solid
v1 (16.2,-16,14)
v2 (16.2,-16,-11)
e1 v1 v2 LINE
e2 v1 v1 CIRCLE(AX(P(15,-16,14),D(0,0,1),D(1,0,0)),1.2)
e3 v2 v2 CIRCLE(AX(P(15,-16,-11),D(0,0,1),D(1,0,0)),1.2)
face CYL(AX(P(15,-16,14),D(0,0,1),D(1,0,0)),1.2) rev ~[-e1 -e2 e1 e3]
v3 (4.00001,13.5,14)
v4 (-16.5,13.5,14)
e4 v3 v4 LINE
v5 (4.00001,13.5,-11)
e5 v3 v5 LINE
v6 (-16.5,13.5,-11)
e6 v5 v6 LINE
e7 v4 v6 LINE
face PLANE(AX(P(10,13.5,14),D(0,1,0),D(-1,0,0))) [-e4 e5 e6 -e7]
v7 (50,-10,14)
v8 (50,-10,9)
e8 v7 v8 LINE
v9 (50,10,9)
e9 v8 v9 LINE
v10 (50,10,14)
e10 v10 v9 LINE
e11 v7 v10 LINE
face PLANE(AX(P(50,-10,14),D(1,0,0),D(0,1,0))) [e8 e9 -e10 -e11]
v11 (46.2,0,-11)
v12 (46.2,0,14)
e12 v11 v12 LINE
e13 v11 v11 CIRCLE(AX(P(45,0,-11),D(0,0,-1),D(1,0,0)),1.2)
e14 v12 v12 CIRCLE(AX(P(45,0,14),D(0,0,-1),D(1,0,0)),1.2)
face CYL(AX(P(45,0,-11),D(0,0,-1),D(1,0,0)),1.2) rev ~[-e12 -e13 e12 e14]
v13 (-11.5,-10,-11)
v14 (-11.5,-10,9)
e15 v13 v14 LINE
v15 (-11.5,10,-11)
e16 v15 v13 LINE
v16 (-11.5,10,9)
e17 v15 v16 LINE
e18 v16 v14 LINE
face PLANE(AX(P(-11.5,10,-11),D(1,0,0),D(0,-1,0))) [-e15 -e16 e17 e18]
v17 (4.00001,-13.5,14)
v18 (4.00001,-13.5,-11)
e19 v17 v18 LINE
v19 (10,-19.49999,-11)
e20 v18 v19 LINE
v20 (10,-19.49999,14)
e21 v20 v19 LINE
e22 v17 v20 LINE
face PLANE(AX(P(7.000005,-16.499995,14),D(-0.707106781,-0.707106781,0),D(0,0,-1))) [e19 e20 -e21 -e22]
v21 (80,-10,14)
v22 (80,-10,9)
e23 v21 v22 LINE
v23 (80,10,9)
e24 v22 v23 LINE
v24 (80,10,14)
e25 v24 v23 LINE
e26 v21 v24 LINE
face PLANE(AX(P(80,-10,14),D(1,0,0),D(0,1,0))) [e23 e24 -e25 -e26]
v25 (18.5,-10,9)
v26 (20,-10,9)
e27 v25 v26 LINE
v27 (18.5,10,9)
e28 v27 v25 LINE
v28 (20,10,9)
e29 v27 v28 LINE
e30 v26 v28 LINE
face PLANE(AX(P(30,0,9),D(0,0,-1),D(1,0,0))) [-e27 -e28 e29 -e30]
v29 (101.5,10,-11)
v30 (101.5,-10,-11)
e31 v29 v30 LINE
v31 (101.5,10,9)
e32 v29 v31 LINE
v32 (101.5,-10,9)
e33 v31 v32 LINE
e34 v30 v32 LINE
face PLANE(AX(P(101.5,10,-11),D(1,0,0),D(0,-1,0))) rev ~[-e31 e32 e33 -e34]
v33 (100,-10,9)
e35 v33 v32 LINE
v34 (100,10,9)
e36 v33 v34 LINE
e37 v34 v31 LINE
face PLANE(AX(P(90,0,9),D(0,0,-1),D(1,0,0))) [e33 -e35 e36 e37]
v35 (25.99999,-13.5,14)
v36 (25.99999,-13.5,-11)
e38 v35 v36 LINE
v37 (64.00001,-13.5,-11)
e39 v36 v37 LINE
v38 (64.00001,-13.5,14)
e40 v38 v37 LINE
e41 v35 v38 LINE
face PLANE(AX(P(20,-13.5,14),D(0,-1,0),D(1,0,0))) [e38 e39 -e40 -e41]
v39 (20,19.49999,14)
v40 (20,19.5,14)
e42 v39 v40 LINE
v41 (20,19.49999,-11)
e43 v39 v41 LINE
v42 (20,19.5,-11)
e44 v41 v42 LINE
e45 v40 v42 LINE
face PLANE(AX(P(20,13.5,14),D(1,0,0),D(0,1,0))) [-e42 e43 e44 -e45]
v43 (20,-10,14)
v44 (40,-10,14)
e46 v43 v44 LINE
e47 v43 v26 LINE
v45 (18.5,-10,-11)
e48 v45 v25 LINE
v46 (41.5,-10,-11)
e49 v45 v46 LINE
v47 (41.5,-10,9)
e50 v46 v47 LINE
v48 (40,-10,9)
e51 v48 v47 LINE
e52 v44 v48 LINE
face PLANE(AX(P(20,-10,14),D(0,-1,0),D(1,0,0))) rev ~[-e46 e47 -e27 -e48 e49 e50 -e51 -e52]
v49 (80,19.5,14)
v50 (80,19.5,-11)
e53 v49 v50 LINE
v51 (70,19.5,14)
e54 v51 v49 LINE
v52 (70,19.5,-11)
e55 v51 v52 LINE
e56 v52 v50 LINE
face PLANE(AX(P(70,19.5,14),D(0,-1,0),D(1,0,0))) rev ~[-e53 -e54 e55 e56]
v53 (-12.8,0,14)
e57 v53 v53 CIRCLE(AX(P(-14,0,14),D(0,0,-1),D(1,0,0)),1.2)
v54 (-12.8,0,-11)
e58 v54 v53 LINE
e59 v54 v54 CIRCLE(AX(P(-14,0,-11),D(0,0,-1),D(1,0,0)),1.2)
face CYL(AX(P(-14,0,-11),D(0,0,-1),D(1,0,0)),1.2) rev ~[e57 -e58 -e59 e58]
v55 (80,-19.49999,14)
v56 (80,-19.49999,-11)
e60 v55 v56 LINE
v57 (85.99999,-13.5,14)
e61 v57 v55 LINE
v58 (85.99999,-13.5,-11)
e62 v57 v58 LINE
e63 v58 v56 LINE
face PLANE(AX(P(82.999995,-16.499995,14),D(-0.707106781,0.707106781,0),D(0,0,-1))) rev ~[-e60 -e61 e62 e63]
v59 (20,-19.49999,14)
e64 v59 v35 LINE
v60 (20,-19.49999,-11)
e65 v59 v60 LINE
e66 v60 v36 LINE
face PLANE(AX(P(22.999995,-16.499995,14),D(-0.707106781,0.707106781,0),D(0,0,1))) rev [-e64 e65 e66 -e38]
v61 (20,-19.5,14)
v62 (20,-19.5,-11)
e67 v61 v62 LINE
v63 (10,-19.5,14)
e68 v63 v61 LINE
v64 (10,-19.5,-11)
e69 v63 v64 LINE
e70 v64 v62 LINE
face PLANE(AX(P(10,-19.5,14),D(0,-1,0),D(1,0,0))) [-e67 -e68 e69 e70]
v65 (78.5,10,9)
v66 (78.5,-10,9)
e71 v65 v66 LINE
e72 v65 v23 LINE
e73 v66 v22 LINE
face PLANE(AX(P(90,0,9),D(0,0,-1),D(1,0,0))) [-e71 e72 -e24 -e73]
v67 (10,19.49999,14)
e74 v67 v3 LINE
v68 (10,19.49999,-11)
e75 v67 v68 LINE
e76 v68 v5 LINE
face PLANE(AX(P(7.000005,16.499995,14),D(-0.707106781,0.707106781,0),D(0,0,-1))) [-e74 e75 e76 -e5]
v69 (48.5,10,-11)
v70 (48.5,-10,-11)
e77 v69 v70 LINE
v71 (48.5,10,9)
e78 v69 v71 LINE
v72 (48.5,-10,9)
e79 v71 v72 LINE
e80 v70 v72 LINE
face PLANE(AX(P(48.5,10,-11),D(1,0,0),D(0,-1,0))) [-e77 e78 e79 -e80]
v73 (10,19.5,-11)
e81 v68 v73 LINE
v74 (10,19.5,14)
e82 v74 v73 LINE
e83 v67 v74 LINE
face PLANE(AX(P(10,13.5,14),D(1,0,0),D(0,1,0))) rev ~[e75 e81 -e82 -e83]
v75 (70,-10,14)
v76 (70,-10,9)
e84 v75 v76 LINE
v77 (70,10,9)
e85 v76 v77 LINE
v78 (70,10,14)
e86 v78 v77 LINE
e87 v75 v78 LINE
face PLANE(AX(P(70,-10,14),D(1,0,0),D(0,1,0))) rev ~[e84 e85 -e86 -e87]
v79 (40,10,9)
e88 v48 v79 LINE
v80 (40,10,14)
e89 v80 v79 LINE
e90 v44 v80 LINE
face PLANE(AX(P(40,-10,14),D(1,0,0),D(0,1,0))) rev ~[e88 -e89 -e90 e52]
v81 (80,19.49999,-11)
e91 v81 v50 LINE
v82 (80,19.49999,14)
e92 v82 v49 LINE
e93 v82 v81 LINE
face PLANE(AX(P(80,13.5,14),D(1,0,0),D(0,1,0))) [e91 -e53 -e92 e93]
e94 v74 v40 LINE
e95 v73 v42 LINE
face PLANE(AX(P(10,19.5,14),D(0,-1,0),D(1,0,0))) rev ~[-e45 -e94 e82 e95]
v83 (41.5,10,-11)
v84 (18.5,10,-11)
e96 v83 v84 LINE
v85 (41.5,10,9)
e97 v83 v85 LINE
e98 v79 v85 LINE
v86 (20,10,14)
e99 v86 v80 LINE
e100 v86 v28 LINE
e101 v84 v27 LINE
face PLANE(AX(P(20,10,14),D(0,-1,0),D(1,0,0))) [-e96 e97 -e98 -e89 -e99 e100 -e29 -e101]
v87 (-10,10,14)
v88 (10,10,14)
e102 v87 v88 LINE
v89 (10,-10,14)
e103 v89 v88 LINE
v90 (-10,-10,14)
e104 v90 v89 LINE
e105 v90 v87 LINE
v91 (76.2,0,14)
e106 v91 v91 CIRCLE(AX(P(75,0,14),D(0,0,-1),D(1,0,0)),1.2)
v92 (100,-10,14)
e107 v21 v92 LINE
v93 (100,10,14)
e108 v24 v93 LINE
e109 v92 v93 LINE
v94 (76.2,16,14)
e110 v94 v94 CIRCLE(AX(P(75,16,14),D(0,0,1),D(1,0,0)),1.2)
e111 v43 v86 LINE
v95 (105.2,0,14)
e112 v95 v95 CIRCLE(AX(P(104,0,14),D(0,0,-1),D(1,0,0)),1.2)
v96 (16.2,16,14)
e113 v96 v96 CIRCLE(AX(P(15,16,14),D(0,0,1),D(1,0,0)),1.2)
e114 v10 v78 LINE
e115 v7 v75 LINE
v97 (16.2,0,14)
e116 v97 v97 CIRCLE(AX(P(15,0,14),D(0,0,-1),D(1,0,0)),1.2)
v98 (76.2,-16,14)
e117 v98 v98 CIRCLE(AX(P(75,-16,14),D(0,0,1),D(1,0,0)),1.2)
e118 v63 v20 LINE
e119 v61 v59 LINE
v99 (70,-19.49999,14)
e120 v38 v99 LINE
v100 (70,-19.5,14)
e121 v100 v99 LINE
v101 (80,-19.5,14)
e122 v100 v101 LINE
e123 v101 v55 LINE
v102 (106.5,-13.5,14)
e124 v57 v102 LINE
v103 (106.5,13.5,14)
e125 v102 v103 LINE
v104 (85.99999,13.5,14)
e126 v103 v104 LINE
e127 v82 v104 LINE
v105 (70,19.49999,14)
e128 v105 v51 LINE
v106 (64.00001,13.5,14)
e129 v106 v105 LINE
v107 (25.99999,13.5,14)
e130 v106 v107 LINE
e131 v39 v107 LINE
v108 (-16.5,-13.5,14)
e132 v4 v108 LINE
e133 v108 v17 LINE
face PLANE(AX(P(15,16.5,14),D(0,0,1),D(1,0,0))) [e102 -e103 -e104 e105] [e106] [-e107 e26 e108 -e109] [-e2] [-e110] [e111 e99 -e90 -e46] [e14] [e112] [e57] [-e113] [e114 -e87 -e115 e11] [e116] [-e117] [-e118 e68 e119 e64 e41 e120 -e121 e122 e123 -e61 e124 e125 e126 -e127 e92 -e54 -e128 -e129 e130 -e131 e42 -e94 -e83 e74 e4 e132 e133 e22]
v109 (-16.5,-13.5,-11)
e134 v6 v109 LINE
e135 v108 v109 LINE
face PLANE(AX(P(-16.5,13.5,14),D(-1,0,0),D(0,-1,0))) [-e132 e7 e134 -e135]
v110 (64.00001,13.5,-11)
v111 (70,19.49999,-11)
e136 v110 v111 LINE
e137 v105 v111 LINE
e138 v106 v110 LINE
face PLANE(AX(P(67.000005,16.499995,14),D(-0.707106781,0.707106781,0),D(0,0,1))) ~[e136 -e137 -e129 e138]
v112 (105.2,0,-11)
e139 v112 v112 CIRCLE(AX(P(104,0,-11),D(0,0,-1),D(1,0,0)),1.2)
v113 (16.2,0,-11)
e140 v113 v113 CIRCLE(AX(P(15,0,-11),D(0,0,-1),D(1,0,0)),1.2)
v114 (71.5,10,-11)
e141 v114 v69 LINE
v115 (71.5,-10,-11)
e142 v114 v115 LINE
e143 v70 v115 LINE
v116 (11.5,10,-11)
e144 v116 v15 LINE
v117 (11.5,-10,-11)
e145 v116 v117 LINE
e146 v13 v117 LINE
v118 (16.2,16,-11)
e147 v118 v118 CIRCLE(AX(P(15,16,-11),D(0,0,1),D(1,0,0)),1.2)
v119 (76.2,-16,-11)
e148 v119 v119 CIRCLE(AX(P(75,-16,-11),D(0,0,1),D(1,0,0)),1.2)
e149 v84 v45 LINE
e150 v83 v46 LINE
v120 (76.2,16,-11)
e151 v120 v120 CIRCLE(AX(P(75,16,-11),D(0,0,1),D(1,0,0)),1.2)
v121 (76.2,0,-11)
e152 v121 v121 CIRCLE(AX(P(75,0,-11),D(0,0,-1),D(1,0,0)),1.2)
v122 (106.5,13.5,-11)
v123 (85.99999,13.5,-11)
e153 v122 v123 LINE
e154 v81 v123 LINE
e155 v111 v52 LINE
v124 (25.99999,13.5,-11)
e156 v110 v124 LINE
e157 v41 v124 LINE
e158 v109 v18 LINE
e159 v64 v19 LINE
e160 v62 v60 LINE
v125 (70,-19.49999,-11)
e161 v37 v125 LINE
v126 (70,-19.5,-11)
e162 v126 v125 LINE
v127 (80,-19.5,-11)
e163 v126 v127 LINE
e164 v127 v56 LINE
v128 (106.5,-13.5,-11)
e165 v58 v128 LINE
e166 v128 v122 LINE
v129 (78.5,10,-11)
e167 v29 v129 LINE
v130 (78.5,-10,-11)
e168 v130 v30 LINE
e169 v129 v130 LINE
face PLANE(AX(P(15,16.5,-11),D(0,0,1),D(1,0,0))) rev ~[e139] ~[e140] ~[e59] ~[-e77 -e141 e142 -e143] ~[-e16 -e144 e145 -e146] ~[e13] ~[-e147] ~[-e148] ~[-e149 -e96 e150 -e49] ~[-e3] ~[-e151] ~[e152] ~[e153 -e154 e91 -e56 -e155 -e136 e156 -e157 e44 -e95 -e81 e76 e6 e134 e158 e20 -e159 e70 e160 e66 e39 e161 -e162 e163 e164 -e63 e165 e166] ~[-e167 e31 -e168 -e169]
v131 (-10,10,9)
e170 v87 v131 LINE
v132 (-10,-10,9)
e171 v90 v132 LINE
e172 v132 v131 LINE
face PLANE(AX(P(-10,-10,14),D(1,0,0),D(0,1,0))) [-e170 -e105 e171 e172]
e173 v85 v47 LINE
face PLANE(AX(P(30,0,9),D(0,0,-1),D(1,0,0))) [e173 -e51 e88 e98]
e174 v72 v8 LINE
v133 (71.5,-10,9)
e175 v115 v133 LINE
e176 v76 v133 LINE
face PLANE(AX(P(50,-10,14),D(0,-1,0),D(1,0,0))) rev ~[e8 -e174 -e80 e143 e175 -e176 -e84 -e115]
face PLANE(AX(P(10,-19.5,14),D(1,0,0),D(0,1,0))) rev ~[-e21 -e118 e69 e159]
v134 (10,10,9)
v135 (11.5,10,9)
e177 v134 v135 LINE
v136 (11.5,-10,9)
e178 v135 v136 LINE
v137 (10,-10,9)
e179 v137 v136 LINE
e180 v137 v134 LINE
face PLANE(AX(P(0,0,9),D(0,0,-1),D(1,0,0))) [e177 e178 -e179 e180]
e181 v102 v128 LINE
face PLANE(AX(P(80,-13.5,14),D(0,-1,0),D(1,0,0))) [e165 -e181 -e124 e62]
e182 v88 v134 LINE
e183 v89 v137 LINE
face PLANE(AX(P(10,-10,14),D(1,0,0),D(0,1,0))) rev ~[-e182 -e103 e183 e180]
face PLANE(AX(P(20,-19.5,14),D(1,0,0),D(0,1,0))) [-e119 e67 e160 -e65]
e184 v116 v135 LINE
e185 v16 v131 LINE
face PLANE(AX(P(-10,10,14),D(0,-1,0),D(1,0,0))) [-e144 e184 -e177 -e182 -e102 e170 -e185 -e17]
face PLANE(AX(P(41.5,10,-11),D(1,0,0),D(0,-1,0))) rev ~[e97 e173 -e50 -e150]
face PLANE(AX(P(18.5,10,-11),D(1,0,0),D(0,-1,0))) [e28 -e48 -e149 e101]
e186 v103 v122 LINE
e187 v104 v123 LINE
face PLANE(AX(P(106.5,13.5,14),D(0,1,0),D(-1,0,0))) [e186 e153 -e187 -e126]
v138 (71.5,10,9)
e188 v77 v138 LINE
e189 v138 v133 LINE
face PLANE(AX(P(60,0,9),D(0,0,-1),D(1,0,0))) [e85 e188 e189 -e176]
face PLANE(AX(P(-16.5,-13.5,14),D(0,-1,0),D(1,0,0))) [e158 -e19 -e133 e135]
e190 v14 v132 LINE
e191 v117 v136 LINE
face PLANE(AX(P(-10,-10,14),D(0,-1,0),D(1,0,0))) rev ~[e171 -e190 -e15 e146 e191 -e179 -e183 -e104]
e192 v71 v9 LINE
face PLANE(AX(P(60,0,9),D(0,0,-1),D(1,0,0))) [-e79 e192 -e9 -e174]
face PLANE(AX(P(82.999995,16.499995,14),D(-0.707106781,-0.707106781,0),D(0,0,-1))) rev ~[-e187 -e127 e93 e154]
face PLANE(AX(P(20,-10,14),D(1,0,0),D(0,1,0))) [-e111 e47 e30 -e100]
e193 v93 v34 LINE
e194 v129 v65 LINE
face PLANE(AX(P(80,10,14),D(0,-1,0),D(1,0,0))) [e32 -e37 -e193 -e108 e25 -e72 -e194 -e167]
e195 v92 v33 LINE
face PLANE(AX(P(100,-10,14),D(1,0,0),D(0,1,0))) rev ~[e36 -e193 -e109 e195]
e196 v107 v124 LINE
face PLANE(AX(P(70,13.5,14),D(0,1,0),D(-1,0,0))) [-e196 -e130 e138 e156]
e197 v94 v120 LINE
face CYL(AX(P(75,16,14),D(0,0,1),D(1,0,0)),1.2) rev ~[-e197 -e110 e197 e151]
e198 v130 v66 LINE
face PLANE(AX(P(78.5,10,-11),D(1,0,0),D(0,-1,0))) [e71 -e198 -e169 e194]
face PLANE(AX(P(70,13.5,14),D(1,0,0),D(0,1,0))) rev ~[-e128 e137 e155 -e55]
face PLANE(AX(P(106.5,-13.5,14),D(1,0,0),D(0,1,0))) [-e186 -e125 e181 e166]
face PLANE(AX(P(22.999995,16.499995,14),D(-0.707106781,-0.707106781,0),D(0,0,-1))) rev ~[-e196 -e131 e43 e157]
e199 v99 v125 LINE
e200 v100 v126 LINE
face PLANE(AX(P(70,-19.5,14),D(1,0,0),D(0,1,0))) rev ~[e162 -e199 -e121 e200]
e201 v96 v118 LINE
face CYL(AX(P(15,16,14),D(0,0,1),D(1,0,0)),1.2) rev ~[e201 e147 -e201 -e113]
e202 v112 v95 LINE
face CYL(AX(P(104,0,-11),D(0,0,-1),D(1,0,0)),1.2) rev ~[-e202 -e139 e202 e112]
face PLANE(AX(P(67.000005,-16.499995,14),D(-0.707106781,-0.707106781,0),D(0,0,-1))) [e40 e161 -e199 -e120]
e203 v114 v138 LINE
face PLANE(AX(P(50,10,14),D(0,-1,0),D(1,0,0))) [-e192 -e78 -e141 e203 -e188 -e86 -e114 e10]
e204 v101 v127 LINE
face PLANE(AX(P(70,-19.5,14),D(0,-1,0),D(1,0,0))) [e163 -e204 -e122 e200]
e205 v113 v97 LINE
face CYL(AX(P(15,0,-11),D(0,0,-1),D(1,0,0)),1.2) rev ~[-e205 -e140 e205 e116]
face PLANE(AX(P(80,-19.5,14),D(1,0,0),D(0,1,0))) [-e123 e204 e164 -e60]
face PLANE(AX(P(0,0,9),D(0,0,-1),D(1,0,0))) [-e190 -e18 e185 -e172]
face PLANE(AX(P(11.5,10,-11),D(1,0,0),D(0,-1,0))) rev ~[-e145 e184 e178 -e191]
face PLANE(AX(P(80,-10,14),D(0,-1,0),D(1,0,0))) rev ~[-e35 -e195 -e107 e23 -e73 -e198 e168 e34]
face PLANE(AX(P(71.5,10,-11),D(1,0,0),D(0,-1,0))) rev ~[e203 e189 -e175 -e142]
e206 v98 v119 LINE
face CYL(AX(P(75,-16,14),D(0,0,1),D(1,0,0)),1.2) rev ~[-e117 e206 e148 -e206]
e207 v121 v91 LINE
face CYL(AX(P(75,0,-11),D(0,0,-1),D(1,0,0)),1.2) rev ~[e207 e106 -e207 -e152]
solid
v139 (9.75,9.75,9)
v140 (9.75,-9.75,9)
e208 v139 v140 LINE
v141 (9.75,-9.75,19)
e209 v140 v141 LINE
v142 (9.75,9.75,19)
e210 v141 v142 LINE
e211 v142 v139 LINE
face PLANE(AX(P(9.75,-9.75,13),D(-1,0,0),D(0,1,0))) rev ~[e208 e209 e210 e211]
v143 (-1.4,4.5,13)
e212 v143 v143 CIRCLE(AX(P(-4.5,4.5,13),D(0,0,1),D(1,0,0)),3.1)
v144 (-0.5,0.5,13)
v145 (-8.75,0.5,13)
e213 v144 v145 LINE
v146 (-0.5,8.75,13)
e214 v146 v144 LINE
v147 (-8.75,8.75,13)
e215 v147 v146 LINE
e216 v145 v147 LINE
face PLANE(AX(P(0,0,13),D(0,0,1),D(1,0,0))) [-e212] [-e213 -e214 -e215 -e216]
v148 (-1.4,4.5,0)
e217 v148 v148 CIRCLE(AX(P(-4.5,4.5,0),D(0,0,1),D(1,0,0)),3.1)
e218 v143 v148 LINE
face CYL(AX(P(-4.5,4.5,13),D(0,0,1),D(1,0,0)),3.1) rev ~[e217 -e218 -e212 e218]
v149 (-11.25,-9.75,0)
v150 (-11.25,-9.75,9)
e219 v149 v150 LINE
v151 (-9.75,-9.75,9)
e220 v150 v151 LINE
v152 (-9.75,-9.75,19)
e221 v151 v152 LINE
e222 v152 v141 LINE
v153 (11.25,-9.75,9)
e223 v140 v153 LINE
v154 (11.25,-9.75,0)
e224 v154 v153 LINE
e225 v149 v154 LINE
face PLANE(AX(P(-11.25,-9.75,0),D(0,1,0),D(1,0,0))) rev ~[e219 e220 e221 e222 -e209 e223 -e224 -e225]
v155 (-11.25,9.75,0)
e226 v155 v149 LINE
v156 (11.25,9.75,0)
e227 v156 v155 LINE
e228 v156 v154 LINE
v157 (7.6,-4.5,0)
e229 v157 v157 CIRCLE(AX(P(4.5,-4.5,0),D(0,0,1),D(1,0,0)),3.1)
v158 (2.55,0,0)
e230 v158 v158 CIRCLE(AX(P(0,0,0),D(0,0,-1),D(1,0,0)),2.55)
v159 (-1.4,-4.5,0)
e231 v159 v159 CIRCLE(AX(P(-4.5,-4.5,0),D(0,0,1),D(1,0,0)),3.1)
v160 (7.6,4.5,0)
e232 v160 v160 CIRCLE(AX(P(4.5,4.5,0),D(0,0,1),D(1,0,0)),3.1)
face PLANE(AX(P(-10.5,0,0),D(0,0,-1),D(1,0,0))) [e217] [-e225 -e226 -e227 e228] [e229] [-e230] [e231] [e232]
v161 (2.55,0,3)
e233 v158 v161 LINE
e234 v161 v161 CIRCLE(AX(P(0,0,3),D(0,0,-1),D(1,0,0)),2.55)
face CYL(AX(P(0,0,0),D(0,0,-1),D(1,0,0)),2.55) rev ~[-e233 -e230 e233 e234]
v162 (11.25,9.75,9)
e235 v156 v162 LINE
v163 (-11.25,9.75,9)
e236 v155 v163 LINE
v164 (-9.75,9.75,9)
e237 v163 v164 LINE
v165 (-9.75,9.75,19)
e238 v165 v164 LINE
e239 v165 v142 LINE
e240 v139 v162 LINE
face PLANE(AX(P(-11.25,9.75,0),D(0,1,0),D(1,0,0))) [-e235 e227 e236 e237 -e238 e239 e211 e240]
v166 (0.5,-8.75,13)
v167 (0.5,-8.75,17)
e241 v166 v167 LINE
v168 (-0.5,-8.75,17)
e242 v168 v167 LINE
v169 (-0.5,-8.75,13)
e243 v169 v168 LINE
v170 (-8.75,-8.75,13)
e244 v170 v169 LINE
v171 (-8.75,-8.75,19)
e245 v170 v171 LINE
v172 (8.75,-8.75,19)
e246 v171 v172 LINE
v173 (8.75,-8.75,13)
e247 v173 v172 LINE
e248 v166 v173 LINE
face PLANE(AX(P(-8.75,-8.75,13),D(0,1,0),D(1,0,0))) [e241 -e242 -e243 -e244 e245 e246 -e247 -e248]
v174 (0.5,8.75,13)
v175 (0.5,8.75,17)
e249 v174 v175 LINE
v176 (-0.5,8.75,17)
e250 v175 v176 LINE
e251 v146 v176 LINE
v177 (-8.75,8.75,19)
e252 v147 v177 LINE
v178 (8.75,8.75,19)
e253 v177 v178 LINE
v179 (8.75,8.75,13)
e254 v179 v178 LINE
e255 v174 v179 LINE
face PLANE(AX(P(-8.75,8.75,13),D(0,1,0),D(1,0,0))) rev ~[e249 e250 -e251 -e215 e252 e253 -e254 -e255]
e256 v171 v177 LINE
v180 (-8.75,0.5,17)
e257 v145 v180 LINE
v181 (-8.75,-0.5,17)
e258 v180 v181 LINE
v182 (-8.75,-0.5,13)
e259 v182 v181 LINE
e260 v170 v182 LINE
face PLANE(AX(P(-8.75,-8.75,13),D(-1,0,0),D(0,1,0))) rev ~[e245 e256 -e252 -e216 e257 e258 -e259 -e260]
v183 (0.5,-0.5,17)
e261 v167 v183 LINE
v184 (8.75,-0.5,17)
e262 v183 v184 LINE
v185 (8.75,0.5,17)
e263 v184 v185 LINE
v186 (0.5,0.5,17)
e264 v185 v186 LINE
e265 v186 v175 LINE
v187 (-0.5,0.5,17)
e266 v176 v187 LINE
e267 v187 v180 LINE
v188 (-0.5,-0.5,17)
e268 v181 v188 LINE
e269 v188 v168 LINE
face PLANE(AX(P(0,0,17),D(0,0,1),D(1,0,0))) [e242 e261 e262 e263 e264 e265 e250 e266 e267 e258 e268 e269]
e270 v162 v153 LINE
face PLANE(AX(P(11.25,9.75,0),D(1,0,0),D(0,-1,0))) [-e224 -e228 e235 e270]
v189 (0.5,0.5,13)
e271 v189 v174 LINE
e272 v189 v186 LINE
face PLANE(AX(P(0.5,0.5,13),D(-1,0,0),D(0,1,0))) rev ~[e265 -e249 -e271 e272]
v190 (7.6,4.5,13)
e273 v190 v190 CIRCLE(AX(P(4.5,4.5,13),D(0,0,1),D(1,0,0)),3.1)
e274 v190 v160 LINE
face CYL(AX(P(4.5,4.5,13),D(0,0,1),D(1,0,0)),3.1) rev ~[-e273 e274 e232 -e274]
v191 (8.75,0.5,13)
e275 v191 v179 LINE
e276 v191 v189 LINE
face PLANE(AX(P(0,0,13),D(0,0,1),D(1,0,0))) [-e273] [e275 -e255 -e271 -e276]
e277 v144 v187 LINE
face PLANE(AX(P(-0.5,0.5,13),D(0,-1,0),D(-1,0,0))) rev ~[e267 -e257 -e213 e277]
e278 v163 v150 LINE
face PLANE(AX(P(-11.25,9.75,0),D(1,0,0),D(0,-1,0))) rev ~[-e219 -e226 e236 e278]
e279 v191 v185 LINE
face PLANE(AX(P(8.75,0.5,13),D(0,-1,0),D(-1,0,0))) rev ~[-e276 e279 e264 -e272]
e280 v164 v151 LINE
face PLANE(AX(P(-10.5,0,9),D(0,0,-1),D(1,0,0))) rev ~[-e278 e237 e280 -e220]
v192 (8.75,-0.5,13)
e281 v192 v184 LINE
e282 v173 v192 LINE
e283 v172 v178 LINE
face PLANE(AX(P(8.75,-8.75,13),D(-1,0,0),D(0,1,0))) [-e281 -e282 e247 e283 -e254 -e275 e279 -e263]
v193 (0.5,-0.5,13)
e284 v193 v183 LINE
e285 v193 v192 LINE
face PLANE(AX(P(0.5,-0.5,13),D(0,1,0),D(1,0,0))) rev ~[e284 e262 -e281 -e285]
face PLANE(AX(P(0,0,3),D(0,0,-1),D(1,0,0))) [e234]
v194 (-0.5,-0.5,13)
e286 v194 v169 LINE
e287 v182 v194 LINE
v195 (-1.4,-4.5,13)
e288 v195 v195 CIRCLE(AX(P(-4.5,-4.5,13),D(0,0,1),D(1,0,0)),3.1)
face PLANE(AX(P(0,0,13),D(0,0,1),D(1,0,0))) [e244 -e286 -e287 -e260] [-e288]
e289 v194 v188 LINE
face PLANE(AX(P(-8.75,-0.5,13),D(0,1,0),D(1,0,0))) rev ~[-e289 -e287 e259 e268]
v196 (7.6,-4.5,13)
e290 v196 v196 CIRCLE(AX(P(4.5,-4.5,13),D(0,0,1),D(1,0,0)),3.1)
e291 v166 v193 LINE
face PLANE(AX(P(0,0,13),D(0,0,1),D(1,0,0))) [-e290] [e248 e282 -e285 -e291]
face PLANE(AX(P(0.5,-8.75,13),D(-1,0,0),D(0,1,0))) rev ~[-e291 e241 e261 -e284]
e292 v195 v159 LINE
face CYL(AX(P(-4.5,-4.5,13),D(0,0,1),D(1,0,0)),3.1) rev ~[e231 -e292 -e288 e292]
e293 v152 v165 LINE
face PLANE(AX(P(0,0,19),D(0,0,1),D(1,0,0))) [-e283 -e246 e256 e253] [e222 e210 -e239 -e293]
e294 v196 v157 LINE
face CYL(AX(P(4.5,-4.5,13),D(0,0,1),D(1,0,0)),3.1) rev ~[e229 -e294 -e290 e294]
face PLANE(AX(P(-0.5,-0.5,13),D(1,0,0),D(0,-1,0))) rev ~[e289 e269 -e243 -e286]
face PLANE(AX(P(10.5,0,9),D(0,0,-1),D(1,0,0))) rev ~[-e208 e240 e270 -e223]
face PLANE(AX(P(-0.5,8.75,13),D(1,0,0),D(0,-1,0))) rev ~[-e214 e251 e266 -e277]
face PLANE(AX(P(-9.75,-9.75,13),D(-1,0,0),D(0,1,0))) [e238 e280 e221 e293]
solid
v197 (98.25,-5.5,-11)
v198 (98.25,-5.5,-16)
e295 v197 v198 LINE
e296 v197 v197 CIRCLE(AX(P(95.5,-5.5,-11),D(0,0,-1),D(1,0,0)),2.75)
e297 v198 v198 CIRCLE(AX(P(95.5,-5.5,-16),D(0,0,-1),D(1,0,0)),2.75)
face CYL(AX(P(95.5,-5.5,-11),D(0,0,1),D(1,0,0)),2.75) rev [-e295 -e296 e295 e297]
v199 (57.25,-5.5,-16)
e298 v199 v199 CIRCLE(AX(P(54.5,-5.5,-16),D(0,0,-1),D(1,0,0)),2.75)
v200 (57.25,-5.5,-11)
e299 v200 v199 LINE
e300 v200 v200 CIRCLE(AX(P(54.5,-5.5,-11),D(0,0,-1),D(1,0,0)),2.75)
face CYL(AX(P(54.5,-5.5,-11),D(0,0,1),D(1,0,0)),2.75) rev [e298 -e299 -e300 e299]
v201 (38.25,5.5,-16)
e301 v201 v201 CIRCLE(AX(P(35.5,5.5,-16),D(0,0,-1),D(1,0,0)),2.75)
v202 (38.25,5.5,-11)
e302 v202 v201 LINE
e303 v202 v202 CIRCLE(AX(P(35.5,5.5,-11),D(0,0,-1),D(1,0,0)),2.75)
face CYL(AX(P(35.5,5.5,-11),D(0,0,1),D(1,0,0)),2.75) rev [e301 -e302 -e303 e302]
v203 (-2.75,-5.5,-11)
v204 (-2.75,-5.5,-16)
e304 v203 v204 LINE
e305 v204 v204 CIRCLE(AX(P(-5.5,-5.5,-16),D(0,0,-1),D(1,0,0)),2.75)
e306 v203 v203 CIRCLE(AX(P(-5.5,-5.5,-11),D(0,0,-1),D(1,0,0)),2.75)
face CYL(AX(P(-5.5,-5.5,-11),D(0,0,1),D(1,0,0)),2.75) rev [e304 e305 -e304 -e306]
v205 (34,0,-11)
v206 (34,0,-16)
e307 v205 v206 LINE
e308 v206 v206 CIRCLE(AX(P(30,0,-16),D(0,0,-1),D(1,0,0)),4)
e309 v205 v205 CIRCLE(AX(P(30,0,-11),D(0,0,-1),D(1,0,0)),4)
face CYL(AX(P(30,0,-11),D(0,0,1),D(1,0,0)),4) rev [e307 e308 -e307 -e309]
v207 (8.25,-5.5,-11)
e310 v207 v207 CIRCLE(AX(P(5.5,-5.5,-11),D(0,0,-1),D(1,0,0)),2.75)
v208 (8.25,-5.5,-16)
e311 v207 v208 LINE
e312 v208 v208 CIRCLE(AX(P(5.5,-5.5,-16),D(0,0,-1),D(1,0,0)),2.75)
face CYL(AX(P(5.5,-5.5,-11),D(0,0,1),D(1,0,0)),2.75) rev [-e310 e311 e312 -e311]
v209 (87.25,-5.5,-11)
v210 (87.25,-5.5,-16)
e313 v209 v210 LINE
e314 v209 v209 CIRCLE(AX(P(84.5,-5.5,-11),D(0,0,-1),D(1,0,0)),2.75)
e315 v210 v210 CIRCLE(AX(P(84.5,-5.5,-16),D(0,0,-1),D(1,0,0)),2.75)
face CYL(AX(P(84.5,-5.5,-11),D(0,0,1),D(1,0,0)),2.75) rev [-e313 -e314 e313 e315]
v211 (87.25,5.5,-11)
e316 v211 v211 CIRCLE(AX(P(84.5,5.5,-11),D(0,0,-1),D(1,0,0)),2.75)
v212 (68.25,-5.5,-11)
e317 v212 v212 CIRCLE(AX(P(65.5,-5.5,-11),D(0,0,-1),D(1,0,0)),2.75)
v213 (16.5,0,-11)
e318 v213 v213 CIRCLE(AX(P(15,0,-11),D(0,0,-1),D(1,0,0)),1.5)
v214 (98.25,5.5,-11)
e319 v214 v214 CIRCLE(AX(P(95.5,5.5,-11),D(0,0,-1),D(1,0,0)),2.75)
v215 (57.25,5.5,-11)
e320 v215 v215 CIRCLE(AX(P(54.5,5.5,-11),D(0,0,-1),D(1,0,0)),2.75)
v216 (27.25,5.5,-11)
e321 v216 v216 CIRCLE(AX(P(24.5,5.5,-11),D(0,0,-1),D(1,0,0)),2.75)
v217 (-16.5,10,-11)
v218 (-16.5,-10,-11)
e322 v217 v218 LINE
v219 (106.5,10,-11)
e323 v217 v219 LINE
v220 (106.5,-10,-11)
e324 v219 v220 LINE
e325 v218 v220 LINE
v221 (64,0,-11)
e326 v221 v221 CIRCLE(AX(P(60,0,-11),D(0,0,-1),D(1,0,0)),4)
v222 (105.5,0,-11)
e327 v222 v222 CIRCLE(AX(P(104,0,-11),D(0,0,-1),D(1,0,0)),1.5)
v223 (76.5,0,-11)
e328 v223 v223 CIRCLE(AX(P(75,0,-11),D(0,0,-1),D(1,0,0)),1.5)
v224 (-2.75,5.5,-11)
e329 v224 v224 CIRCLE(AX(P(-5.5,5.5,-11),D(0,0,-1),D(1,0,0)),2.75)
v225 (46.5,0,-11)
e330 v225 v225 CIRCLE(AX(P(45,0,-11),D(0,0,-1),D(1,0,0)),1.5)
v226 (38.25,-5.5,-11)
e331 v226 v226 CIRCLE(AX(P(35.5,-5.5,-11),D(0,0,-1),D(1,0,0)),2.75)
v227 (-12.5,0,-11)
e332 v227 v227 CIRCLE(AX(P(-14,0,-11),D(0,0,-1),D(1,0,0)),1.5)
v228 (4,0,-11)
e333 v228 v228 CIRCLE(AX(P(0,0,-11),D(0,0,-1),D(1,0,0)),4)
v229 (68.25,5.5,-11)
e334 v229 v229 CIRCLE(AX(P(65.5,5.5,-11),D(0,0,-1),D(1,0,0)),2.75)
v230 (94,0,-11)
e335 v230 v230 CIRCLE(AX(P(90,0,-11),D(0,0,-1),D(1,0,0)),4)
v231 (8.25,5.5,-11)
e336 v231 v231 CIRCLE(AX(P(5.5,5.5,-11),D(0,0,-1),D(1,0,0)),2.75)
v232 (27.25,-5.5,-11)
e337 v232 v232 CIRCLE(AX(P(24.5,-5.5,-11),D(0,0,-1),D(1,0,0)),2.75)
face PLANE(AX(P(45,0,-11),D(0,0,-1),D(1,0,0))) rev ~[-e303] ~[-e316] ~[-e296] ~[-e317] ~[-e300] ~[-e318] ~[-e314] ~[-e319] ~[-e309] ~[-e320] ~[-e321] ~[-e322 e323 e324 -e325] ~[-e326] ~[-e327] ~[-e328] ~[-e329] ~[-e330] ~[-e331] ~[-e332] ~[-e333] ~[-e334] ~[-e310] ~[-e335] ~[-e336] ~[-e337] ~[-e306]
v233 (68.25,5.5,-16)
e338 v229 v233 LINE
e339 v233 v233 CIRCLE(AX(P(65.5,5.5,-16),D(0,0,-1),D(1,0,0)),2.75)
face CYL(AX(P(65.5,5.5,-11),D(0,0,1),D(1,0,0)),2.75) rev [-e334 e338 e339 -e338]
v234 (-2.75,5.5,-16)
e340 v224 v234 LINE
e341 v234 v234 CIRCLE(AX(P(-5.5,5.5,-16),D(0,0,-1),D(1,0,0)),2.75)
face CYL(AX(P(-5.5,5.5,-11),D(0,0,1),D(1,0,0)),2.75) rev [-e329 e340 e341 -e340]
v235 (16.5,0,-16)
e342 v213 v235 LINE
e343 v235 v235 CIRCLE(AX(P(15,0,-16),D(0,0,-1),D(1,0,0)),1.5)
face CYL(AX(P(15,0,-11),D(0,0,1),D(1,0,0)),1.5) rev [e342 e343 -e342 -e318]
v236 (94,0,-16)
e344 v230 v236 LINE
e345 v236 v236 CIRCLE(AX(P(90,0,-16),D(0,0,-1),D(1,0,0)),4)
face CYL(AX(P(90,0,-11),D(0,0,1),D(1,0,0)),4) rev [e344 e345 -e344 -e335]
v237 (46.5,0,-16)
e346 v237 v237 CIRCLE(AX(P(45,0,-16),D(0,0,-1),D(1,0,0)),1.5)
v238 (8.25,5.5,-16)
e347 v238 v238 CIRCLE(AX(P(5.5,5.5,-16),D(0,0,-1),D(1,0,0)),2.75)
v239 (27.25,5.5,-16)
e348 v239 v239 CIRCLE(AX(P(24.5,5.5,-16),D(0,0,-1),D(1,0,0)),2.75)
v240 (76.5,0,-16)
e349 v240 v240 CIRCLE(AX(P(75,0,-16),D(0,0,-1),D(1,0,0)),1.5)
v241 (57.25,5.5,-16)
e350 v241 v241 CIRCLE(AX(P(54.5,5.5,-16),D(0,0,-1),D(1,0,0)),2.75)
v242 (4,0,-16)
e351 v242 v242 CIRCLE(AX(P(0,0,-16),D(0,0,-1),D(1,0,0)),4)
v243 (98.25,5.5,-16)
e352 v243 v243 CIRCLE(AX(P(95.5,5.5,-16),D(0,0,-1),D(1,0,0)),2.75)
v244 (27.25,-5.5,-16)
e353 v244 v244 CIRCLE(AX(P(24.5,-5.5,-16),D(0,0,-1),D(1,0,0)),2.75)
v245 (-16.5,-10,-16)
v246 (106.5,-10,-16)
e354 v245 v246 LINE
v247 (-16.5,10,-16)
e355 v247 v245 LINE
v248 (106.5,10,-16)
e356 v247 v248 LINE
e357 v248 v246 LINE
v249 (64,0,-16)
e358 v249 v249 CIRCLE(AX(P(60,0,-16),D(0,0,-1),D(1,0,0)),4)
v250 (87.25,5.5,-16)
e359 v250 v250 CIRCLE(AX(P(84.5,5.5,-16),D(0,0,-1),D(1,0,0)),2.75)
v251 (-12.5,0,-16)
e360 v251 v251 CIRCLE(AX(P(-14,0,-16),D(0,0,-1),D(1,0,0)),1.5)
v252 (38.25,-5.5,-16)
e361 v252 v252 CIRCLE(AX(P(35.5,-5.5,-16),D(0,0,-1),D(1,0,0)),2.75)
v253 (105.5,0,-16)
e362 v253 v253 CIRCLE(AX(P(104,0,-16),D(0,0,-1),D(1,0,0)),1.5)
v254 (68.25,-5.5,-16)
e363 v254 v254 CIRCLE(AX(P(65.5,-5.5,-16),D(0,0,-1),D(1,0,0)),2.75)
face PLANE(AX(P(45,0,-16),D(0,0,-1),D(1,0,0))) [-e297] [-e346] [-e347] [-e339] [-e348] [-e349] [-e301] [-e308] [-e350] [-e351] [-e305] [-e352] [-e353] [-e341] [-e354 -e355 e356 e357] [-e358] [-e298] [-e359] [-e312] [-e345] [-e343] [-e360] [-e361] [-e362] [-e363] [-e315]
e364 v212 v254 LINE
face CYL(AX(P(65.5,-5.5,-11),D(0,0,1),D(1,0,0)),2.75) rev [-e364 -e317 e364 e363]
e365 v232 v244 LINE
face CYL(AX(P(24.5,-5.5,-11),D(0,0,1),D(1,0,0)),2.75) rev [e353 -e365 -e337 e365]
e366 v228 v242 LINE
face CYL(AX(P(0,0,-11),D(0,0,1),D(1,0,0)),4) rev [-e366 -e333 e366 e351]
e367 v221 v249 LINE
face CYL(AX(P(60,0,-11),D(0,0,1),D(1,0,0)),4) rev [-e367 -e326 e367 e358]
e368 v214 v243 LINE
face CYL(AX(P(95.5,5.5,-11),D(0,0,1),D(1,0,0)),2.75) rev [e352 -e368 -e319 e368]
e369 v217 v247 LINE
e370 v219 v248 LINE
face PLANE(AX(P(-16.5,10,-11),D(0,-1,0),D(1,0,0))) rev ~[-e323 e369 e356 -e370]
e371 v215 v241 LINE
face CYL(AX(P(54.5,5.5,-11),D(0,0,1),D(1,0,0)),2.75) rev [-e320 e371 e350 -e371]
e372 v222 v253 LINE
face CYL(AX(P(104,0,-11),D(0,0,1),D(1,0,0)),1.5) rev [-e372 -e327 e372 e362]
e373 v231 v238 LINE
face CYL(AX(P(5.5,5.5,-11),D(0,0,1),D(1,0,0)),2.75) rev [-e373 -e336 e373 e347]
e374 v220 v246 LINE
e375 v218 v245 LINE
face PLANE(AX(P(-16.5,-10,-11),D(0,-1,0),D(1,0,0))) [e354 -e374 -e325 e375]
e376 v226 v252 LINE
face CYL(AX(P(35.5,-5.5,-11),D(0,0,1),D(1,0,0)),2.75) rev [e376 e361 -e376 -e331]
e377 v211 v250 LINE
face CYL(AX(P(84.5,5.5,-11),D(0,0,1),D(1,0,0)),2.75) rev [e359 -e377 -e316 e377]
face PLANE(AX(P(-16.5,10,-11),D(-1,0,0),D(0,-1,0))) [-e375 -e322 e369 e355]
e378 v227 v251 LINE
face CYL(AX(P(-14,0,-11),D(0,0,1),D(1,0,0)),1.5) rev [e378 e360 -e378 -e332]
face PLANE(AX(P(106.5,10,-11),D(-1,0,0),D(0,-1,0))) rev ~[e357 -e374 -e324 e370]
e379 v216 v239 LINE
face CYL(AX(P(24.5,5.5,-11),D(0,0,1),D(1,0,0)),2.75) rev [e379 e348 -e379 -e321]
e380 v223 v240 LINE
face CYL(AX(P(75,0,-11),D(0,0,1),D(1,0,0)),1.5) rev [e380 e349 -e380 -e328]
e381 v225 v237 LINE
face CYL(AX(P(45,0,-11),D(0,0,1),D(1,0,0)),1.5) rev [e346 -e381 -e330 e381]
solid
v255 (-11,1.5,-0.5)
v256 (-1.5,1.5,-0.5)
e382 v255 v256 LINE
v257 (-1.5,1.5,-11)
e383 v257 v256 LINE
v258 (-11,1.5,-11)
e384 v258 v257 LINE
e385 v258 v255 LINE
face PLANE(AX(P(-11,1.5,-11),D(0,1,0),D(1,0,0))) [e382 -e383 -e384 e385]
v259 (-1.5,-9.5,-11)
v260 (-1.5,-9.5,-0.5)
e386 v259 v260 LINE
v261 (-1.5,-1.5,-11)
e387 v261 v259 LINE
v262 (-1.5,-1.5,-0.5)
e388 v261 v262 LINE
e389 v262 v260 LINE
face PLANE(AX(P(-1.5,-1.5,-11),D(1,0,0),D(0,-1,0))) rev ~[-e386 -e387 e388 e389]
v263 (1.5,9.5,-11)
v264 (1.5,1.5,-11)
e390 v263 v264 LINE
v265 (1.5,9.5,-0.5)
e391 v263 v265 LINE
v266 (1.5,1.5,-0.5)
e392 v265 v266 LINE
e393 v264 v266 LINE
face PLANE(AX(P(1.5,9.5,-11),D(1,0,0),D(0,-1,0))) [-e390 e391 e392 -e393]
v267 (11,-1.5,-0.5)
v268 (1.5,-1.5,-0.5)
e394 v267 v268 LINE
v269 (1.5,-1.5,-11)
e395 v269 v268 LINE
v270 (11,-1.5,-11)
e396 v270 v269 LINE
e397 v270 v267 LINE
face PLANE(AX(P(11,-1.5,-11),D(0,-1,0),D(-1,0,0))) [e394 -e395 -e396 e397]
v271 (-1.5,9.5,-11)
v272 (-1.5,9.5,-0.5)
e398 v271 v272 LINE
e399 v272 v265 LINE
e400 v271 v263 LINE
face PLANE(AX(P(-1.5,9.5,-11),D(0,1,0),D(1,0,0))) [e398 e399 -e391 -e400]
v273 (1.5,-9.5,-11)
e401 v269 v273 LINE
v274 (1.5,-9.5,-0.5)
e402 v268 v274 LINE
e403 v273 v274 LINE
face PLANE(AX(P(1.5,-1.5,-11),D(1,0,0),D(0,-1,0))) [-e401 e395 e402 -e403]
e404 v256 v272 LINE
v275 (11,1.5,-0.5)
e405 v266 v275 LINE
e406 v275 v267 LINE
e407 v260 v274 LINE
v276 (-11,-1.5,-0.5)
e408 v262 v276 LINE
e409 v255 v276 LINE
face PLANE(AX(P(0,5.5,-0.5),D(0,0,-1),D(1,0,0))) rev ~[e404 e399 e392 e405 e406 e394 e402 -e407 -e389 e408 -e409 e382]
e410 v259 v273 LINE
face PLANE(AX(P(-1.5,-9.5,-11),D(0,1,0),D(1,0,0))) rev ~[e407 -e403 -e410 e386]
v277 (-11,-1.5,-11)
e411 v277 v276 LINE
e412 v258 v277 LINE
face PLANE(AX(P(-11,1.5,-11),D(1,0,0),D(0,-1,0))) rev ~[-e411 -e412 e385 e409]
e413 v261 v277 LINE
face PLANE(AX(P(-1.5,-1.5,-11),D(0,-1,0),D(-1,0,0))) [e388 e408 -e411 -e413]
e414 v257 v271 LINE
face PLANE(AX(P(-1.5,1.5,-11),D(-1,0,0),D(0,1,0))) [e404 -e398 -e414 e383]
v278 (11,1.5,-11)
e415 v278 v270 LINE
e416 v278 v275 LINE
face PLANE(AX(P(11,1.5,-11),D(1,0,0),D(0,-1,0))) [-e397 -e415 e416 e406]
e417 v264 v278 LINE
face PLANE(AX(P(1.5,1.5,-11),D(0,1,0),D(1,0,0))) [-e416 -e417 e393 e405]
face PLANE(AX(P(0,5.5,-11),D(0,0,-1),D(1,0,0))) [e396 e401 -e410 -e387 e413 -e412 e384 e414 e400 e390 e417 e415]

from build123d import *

# Parameters (mm, degrees)
F0_W      = 19.5
F0_H      = 19.5
F1_DEPTH  = 13
F2_W      = 19.5
F2_H      = 19.5
F2_W_2    = 17.5
F2_H_2    = 17.5
F3_DEPTH  = 6
F5_DEPTH  = 4
F6_R      = 3.1
F7_DEPTH  = 19
F8_W      = 1.5
F8_H      = 19.5
F9_DEPTH  = 9
F10_R     = 2.55
F11_DEPTH = 3
F13_W     = 10
F13_H     = 6
F13_W_2   = 20
F13_H_2   = 20
F14_DEPTH = 25
F15_W     = 23
F15_H     = 20
F16_DEPTH = 20
F17_R     = 1.2
F18_DEPTH = 30
F19_R     = 1.2
F20_DEPTH = 30.001
F21_W     = 123
F21_H     = 20
F21_R     = 2.75
F21_R_2   = 1.5
F21_R_3   = 4
F22_DEPTH = 5
F23_SIZE  = 5.99999
F25_W     = 3
F25_H     = 8
F25_H_2   = 3
F25_W_2   = 9.5
F26_DEPTH = 10.5


# Not quite as in the source:
# - a fillet or chamfer is up to 0.001 mm smaller than in the source, because OpenCascade refuses the exact size


with BuildPart() as f1:
    # F0 (on Top) → F1 (new body)
    with BuildSketch(Plane.XY):
        Rectangle(F0_W, F0_H)
    extrude(amount=F1_DEPTH)

    # F2 (on face) → F3 (join)
    with BuildSketch(Plane.XY.offset(13)):
        Rectangle(F2_W, F2_H)
        Rectangle(F2_W_2, F2_H_2, mode=Mode.SUBTRACT)
    extrude(amount=F3_DEPTH)

    # F4 (on face) → F5 (join)
    with BuildSketch(Plane.XY.offset(13)):
        Polygon((0.5, 8.75), (-0.5, 8.75), (-0.5, 0.5), (-8.75, 0.5), (-8.75, -0.5), (-0.5, -0.5), (-0.5, -8.75), (0.5, -8.75), (0.5, -0.5), (8.75, -0.5), (8.75, 0.5), (0.5, 0.5), align=None)
    extrude(amount=F5_DEPTH)

    # F6 (on face) → F7 (cut)
    with BuildSketch(Plane.XY.offset(13)):
        with Locations((-4.5, 4.5)):
            Circle(F6_R)
        with Locations((-4.5, -4.5)):
            Circle(F6_R)
        with Locations((4.5, 4.5)):
            Circle(F6_R)
        with Locations((4.5, -4.5)):
            Circle(F6_R)
    extrude(amount=-F7_DEPTH, mode=Mode.SUBTRACT)

    # F8 (on face) → F9 (join)
    with BuildSketch(Plane(origin=(0, 0, 0), x_dir=(1, 0, 0), z_dir=(0, 0, -1))):
        with Locations((-10.5, 0)):
            Rectangle(F8_W, F8_H)
        with Locations((10.5, 0)):
            Rectangle(F8_W, F8_H)
    extrude(amount=-F9_DEPTH)

    # F10 (on face) → F11 (cut)
    with BuildSketch(Plane(origin=(0, 0, 0), x_dir=(1, 0, 0), z_dir=(0, 0, -1))):
        Circle(F10_R)
    extrude(amount=-F11_DEPTH, mode=Mode.SUBTRACT)


with BuildPart() as f14:
    # F13 (on offset) → F14 (new body)
    with BuildSketch(Plane.XY.offset(14)):
        with Locations((15, 16.5)):
            Rectangle(F13_W, F13_H)
        Polygon((20, 13.5), (10, 13.5), (-16.5, 13.5), (-16.5, -13.5), (10, -13.5), (20, -13.5), (70, -13.5), (80, -13.5), (106.5, -13.5), (106.5, 13.5), (80, 13.5), (70, 13.5), align=None)
        Rectangle(F13_W_2, F13_H_2, mode=Mode.SUBTRACT)
        with Locations((30, 0)):
            Rectangle(F13_W_2, F13_H_2, mode=Mode.SUBTRACT)
        with Locations((60, 0)):
            Rectangle(F13_W_2, F13_H_2, mode=Mode.SUBTRACT)
        with Locations((90, 0)):
            Rectangle(F13_W_2, F13_H_2, mode=Mode.SUBTRACT)
        with Locations((75, 16.5)):
            Rectangle(F13_W, F13_H)
        with Locations((15, -16.5)):
            Rectangle(F13_W, F13_H)
        with Locations((75, -16.5)):
            Rectangle(F13_W, F13_H)
    extrude(amount=-F14_DEPTH)

    # F15 (on face) → F16 (cut)
    with BuildSketch(Plane(origin=(0, 0, -11), x_dir=(1, 0, 0), z_dir=(0, 0, -1))):
        Rectangle(F15_W, F15_H)
        with Locations((30, 0)):
            Rectangle(F15_W, F15_H)
        with Locations((60, 0)):
            Rectangle(F15_W, F15_H)
        with Locations((90, 0)):
            Rectangle(F15_W, F15_H)
    extrude(amount=-F16_DEPTH, mode=Mode.SUBTRACT)

    # F17 (on face) → F18 (cut)
    with BuildSketch(Plane.XY.offset(14)):
        with Locations((15, 16)):
            Circle(F17_R)
        with Locations((15, -16)):
            Circle(F17_R)
        with Locations((75, 16)):
            Circle(F17_R)
        with Locations((75, -16)):
            Circle(F17_R)
    extrude(amount=-F18_DEPTH, mode=Mode.SUBTRACT)

    # F19 (on face) → F20 (cut, through all)
    with BuildSketch(Plane(origin=(0, 0, -11), x_dir=(1, 0, 0), z_dir=(0, 0, -1))):
        with Locations((-14, 0)):
            Circle(F19_R)
        with Locations((15, 0)):
            Circle(F19_R)
        with Locations((45, 0)):
            Circle(F19_R)
        with Locations((75, 0)):
            Circle(F19_R)
        with Locations((104, 0)):
            Circle(F19_R)
    extrude(amount=-F20_DEPTH, mode=Mode.SUBTRACT)

    # F23 (size 6 in the source; OpenCascade refuses exactly that, so slightly less here)
    f23_edges = [f14.edges().sort_by_distance(p)[0] for p in [
        (10, -13.5, 1.5),
        (20, -13.5, 1.5),
        (70, -13.5, 1.5),
        (80, -13.5, 1.5),
        (10, 13.5, 1.5),
        (20, 13.5, 1.5),
        (70, 13.5, 1.5),
        (80, 13.5, 1.5),
    ]]
    chamfer(f23_edges, length=F23_SIZE)


with BuildPart() as f22:
    # F21 (on face) → F22 (new body)
    with BuildSketch(Plane(origin=(0, 0, -11), x_dir=(1, 0, 0), z_dir=(0, 0, -1))):
        with Locations((45, 0)):
            Rectangle(F21_W, F21_H)
        with Locations((-5.5, -5.5)):
            Circle(F21_R, mode=Mode.SUBTRACT)
        with Locations((5.5, -5.5)):
            Circle(F21_R, mode=Mode.SUBTRACT)
        with Locations((24.5, -5.5)):
            Circle(F21_R, mode=Mode.SUBTRACT)
        with Locations((35.5, -5.5)):
            Circle(F21_R, mode=Mode.SUBTRACT)
        with Locations((54.5, -5.5)):
            Circle(F21_R, mode=Mode.SUBTRACT)
        with Locations((65.5, -5.5)):
            Circle(F21_R, mode=Mode.SUBTRACT)
        with Locations((84.5, -5.5)):
            Circle(F21_R, mode=Mode.SUBTRACT)
        with Locations((95.5, -5.5)):
            Circle(F21_R, mode=Mode.SUBTRACT)
        with Locations((-14, 0)):
            Circle(F21_R_2, mode=Mode.SUBTRACT)
        Circle(F21_R_3, mode=Mode.SUBTRACT)
        with Locations((15, 0)):
            Circle(F21_R_2, mode=Mode.SUBTRACT)
        with Locations((30, 0)):
            Circle(F21_R_3, mode=Mode.SUBTRACT)
        with Locations((-5.5, 5.5)):
            Circle(F21_R, mode=Mode.SUBTRACT)
        with Locations((5.5, 5.5)):
            Circle(F21_R, mode=Mode.SUBTRACT)
        with Locations((24.5, 5.5)):
            Circle(F21_R, mode=Mode.SUBTRACT)
        with Locations((35.5, 5.5)):
            Circle(F21_R, mode=Mode.SUBTRACT)
        with Locations((45, 0)):
            Circle(F21_R_2, mode=Mode.SUBTRACT)
        with Locations((60, 0)):
            Circle(F21_R_3, mode=Mode.SUBTRACT)
        with Locations((75, 0)):
            Circle(F21_R_2, mode=Mode.SUBTRACT)
        with Locations((90, 0)):
            Circle(F21_R_3, mode=Mode.SUBTRACT)
        with Locations((104, 0)):
            Circle(F21_R_2, mode=Mode.SUBTRACT)
        with Locations((54.5, 5.5)):
            Circle(F21_R, mode=Mode.SUBTRACT)
        with Locations((65.5, 5.5)):
            Circle(F21_R, mode=Mode.SUBTRACT)
        with Locations((84.5, 5.5)):
            Circle(F21_R, mode=Mode.SUBTRACT)
        with Locations((95.5, 5.5)):
            Circle(F21_R, mode=Mode.SUBTRACT)
    extrude(amount=F22_DEPTH)


with BuildPart() as f26:
    # F25 (on offset) → F26 (new body)
    with BuildSketch(Plane(origin=(0, 0, -11), x_dir=(1, 0, 0), z_dir=(0, 0, -1))):
        with Locations((0, -5.5)):
            Rectangle(F25_W, F25_H)
        Rectangle(F25_W, F25_H_2)
        with Locations((6.25, 0)):
            Rectangle(F25_W_2, F25_H_2)
        with Locations((-6.25, 0)):
            Rectangle(F25_W_2, F25_H_2)
        with Locations((0, 5.5)):
            Rectangle(F25_W, F25_H)
    extrude(amount=-F26_DEPTH)


solid = Compound([f1.part, f14.part, f22.part, f26.part])
